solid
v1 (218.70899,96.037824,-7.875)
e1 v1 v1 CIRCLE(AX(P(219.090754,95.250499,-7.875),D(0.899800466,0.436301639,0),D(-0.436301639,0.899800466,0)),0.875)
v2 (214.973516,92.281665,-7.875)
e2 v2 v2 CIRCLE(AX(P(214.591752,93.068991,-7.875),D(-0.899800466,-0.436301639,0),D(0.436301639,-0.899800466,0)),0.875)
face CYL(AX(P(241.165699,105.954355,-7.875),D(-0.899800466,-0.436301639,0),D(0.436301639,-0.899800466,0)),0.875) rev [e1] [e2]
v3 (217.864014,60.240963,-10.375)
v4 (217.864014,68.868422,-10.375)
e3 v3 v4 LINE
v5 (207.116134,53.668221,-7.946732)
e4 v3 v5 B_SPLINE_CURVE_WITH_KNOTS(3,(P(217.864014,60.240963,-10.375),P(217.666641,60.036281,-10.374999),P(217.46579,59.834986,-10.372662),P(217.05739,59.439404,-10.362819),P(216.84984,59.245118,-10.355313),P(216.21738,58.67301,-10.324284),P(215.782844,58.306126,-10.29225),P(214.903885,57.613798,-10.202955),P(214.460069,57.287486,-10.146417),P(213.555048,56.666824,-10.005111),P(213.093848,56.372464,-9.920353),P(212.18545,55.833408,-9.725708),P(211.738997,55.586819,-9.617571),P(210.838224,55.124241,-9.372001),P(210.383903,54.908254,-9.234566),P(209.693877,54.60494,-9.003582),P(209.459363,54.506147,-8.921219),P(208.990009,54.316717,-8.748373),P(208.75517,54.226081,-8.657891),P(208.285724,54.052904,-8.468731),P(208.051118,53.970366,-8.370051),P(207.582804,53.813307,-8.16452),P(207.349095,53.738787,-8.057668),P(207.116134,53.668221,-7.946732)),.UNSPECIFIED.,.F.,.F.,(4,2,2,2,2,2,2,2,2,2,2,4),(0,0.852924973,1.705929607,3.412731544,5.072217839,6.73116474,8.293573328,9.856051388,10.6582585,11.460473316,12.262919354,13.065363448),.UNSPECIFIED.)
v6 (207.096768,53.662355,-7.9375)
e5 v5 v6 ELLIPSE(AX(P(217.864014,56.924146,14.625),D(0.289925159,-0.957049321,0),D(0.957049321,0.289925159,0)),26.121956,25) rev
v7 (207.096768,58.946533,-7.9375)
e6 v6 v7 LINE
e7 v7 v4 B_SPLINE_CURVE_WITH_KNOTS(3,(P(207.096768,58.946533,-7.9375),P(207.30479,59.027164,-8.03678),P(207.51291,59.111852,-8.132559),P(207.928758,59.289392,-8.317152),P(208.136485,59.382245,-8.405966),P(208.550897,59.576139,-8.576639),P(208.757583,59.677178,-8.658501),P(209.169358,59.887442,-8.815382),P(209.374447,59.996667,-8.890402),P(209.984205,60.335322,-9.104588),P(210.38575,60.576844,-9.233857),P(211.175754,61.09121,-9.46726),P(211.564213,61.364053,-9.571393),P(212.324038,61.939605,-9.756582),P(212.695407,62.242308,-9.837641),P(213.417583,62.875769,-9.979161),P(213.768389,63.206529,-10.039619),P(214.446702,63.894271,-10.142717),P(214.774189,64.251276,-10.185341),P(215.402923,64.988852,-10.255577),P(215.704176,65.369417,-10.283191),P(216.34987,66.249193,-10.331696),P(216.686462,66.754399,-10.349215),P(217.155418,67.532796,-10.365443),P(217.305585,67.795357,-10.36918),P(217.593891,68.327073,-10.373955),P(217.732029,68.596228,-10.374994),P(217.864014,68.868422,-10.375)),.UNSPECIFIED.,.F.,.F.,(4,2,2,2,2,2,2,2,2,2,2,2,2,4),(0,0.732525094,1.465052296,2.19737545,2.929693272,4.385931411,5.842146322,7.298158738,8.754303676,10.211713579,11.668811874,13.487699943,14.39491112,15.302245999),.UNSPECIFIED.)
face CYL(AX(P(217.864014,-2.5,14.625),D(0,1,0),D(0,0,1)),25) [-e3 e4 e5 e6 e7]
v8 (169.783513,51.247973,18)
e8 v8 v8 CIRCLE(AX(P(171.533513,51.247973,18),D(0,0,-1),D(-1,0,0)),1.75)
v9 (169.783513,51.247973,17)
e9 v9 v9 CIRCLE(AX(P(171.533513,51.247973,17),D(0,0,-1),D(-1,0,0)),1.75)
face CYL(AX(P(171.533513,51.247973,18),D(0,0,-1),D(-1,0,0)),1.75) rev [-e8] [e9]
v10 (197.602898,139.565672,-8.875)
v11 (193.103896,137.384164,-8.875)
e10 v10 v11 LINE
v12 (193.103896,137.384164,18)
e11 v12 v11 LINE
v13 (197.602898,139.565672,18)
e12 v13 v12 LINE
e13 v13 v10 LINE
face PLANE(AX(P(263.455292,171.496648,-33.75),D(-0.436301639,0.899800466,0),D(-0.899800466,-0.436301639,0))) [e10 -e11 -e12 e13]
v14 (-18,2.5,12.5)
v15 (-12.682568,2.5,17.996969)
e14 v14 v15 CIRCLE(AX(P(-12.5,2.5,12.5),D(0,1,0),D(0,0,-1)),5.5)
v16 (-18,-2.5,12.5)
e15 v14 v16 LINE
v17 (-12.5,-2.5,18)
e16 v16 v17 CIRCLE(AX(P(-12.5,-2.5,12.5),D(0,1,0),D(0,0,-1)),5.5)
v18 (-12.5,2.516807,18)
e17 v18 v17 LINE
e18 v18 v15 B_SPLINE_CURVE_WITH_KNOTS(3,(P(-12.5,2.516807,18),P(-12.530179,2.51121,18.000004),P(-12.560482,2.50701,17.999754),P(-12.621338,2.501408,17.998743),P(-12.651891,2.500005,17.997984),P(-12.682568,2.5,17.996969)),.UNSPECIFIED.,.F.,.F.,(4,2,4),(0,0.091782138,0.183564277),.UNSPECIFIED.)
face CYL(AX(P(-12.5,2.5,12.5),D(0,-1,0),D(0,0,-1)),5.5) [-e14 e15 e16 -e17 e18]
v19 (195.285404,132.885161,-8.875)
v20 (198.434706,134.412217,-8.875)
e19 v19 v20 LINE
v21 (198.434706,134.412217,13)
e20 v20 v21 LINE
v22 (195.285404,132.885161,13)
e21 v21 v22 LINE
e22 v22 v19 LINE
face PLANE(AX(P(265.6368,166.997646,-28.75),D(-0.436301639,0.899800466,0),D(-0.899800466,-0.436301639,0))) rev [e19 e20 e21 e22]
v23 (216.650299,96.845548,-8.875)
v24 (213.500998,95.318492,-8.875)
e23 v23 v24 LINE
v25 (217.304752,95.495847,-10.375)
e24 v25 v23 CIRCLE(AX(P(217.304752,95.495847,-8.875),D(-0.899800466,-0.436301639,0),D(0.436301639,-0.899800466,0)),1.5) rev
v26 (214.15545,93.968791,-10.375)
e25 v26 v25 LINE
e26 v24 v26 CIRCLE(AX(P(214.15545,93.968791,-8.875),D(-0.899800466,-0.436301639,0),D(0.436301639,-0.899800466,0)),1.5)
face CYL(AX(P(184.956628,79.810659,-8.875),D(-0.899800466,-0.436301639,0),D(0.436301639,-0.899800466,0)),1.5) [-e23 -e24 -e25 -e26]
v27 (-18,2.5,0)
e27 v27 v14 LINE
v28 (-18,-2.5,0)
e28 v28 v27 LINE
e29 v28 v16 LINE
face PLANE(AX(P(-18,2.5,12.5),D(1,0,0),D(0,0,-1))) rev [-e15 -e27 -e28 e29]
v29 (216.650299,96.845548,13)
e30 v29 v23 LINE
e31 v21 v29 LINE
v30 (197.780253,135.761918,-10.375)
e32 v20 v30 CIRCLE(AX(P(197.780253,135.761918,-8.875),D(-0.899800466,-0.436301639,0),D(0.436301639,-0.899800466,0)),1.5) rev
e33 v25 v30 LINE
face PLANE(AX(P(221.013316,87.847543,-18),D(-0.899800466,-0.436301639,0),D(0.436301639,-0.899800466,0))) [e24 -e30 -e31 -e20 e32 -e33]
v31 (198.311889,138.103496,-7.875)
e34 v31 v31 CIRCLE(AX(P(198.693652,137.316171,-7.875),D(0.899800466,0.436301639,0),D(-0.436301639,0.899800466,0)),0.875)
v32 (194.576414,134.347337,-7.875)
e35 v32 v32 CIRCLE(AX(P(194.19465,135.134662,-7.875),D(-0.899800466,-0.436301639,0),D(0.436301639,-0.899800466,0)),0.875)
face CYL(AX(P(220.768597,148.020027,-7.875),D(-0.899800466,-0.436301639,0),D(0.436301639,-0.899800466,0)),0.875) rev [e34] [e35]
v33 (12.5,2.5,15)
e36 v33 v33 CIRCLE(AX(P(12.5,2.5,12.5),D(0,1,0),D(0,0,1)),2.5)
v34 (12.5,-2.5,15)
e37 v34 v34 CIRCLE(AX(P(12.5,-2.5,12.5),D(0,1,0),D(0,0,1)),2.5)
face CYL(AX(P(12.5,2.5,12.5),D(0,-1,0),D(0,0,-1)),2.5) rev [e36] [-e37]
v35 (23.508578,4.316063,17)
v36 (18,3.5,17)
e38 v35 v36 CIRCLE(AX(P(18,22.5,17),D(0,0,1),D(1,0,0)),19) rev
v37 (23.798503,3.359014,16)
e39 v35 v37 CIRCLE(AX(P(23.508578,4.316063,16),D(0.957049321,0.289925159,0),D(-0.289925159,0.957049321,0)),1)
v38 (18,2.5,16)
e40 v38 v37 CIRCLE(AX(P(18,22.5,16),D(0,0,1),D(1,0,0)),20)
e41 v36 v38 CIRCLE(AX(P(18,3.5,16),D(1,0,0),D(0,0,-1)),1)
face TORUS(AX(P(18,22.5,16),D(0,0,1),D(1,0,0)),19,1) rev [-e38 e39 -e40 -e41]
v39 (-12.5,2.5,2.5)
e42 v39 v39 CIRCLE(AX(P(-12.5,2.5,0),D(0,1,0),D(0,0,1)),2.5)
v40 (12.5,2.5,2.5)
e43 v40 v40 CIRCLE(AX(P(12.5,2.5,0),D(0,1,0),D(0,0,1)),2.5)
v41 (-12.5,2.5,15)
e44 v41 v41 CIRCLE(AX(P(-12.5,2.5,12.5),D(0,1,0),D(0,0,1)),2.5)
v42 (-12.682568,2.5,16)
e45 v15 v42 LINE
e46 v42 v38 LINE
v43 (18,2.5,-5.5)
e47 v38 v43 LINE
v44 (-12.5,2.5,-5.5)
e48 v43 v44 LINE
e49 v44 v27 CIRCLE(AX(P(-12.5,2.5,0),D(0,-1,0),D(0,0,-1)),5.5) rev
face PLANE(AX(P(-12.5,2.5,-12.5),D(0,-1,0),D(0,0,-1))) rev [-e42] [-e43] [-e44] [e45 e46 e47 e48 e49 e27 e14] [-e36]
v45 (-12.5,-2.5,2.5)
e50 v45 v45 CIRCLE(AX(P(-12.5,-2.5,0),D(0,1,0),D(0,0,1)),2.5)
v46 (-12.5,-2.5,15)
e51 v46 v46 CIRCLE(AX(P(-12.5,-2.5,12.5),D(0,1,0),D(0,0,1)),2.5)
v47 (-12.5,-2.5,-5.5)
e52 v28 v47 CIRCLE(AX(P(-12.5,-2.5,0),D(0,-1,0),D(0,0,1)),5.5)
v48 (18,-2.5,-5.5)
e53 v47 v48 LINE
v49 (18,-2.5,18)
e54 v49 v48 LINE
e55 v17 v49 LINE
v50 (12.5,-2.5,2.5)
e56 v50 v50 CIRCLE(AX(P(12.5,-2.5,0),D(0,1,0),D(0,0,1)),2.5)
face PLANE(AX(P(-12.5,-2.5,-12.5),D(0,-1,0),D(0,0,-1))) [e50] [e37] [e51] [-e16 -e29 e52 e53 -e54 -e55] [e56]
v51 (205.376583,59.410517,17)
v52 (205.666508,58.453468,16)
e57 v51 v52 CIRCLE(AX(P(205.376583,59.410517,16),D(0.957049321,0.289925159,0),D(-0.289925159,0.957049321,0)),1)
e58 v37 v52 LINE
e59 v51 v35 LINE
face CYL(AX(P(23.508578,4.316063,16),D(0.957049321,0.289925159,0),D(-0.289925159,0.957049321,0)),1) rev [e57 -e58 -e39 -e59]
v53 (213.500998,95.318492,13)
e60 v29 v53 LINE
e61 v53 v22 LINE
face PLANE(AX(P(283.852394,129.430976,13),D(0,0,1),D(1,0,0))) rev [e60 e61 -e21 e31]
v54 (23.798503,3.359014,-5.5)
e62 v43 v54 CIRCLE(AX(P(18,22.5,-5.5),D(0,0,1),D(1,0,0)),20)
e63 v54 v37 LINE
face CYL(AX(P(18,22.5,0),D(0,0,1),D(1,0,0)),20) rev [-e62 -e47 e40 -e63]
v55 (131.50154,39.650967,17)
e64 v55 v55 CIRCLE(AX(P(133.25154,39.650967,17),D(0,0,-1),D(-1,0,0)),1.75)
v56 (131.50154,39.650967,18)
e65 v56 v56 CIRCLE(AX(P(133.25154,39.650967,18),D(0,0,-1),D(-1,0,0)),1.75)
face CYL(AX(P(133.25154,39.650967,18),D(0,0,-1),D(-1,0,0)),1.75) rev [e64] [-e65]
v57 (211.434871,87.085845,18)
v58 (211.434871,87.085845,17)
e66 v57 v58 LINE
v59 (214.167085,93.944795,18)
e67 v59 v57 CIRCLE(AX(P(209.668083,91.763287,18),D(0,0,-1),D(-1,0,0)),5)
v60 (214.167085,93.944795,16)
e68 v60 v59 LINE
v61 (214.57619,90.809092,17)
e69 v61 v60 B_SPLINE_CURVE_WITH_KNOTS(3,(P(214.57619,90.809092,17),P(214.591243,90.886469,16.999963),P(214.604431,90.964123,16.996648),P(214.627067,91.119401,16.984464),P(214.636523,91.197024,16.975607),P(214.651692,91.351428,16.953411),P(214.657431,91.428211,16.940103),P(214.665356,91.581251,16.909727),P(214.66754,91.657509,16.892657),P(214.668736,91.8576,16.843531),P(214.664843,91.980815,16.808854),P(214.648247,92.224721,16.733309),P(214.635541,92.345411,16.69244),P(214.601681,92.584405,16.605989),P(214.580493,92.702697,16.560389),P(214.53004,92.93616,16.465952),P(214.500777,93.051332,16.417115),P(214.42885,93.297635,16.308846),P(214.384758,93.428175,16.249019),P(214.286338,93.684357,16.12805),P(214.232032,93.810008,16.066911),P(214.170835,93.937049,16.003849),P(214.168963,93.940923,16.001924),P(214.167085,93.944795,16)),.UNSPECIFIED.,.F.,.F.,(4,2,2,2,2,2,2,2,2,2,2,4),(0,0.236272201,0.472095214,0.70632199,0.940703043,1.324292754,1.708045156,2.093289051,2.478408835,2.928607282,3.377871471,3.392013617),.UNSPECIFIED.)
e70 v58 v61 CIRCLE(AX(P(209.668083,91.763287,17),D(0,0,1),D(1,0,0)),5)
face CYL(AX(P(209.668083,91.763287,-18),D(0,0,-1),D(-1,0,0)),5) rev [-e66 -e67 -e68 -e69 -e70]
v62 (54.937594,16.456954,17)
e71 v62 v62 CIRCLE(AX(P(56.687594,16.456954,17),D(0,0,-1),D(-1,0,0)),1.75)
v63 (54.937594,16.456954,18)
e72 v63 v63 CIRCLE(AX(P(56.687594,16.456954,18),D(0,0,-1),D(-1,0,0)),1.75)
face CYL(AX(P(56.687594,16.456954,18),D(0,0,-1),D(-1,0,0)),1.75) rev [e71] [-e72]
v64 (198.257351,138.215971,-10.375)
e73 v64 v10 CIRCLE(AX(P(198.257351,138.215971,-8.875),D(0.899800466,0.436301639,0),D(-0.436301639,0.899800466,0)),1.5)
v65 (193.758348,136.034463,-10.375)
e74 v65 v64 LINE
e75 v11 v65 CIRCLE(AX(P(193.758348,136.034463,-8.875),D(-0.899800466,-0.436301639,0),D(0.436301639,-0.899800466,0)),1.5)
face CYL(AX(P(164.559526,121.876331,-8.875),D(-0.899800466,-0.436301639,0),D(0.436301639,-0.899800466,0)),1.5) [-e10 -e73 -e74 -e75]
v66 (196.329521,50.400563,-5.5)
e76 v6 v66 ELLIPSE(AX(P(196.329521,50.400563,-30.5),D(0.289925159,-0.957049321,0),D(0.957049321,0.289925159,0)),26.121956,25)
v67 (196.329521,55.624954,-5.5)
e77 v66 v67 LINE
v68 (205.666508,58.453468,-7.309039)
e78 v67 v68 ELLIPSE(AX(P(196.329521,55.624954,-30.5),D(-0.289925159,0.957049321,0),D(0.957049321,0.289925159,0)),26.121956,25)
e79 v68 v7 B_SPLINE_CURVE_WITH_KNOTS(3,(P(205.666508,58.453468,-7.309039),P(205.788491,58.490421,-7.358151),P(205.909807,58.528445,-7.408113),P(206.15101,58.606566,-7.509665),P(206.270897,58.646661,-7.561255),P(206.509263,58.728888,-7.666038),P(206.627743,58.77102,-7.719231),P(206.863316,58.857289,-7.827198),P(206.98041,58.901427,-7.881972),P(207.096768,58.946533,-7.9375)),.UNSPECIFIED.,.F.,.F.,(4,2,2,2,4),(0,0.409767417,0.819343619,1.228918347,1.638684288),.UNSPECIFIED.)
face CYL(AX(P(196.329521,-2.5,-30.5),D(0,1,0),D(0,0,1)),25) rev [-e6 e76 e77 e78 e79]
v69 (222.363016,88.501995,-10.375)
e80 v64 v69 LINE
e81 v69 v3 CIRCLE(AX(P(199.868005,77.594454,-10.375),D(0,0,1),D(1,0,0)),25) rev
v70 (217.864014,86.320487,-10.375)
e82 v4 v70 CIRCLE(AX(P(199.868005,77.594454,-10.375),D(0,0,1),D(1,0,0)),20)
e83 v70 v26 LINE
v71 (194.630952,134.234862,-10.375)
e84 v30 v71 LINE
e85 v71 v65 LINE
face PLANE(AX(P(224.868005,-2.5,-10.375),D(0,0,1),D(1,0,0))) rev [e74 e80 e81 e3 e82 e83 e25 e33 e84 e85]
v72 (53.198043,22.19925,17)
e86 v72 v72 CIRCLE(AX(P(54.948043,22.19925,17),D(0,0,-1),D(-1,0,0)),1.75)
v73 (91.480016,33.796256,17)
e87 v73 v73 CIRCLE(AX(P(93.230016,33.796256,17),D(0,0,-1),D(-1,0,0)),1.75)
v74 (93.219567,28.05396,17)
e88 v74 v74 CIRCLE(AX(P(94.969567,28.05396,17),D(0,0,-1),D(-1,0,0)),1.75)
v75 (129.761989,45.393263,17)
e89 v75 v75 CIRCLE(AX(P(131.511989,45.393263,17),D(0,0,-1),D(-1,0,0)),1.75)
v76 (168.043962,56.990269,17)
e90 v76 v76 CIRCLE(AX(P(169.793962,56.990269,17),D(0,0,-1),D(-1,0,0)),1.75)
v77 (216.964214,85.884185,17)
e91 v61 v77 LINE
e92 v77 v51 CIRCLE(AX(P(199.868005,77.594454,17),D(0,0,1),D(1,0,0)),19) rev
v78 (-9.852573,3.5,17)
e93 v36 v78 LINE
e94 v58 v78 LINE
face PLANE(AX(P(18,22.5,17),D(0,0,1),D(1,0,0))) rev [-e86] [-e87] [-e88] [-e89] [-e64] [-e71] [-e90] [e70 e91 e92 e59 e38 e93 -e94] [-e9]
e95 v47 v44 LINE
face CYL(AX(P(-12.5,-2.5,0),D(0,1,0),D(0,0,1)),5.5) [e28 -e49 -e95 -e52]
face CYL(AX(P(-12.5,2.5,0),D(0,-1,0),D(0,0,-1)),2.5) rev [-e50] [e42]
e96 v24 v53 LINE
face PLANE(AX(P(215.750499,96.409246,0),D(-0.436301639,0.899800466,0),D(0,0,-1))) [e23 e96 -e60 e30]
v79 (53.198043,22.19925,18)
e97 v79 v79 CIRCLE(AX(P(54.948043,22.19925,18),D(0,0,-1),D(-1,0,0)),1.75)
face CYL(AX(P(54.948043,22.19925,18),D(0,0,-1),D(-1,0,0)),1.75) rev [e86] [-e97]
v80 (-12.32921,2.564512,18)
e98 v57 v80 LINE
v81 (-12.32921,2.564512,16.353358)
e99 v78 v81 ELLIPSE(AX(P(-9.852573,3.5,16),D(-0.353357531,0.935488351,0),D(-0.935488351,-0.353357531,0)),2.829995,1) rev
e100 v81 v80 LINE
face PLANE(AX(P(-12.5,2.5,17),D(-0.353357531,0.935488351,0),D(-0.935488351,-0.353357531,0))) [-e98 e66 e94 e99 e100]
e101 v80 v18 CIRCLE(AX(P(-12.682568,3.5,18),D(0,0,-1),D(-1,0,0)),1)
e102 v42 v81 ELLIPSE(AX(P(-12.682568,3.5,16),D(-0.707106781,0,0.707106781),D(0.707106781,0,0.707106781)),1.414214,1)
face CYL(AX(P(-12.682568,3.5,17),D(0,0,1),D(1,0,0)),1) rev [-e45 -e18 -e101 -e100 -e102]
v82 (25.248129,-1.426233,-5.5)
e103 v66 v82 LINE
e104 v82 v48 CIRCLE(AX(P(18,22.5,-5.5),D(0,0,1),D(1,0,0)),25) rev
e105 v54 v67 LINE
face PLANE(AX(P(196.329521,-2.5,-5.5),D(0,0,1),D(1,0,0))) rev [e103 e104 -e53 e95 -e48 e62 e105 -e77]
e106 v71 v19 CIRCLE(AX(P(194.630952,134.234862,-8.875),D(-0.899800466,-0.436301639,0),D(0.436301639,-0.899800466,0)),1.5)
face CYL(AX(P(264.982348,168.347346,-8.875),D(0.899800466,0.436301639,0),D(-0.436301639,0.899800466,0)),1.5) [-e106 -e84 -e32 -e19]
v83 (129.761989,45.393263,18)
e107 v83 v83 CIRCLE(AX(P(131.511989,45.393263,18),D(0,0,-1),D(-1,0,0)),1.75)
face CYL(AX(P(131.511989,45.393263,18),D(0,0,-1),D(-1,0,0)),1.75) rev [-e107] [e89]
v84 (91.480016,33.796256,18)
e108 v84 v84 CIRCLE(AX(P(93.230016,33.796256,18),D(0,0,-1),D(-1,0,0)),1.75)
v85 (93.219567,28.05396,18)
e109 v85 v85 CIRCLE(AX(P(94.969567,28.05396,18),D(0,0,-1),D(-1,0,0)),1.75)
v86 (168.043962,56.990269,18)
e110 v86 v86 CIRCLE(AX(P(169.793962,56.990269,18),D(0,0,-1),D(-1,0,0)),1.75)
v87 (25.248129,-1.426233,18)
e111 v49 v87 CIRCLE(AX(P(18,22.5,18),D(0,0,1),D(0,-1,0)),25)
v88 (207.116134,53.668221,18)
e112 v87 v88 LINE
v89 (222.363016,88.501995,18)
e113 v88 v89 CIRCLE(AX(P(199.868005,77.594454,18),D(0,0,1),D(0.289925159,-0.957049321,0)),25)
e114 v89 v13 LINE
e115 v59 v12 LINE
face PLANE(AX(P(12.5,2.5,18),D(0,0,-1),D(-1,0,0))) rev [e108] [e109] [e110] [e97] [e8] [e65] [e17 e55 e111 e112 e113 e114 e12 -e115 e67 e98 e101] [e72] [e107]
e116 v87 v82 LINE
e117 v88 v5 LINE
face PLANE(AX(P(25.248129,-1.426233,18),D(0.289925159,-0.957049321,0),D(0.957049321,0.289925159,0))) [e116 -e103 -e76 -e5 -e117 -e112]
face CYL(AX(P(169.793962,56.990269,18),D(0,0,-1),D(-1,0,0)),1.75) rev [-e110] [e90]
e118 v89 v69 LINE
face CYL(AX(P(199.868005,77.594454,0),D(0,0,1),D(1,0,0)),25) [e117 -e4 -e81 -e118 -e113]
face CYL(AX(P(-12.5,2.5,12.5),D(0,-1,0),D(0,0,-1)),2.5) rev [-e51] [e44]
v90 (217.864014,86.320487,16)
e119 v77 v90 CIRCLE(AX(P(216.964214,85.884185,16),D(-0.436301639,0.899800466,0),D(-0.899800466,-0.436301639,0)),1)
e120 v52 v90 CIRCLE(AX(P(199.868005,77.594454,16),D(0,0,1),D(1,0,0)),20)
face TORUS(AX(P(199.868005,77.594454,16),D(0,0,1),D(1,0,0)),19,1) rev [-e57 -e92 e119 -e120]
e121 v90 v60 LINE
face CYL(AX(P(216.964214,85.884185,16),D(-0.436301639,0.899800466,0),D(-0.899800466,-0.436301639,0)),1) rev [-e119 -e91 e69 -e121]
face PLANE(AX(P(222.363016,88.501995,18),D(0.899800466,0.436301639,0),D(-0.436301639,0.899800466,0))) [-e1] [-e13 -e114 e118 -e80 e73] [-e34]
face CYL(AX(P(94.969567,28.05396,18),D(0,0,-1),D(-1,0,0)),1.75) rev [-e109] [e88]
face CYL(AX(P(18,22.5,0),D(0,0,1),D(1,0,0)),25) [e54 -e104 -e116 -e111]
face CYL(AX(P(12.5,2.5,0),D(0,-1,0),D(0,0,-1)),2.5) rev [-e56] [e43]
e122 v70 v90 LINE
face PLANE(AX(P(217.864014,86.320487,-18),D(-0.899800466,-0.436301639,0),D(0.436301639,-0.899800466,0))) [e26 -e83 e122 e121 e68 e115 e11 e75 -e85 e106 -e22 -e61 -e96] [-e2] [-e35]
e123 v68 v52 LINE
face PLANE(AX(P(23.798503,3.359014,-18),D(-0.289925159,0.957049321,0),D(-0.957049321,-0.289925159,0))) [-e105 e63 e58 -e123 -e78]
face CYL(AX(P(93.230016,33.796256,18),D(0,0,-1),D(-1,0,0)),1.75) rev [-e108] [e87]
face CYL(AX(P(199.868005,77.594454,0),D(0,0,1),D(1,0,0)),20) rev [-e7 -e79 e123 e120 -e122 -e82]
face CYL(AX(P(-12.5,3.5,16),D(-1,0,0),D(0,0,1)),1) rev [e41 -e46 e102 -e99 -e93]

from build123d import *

# Parameters (mm, degrees)
SKETCH2_R            = 2.5000000000000004
SKETCH2_R_2          = 2.5000000000000018
BOSS_EXTRUDE1_DEPTH  = 2.5
SKETCH5_W            = 36
SKETCH5_H            = 5
SKETCH11_W           = 51.75
SKETCH11_H           = 51.75
SKETCH11_W_2         = 41.75000000000001
SKETCH11_H_2         = 41.75000000000001
BOSS_EXTRUDE2_DEPTH  = 5
SKETCH14_W           = 41.75000000000001
SKETCH14_H           = 41.75000000000003
BOSS_EXTRUDE3_DEPTH  = 1.5
FILLET1_R            = 8
SKETCH18_R           = 0.8750000000000002
CUT_EXTRUDE3_DEPTH   = 254.3041056928498
CUT_EXTRUDE4_START   = -26.0000001
CUT_EXTRUDE4_DEPTH   = 15.6250001
CUT_EXTRUDE4_START_2 = -2.5
CUT_EXTRUDE4_2_DEPTH = 88.820487138
CUT_EXTRUDE5_DEPTH   = 245.11833407729904
FILLET2_R            = 1.5
BOSS_EXTRUDE4_DEPTH  = 1
FILLET3_R            = 1
SKETCH22_R           = 1.7500000000000062
SKETCH22_R_2         = 1.750000000000084
CUT_EXTRUDE6_DEPTH   = 267.0706428279103
LPATTERN1_COUNT      = 4
LPATTERN1_PITCH      = 40
FILLET4_R            = 5


with BuildPart() as part:
    # Sketch2 → Boss-Extrude1 (new, symmetric)
    with BuildSketch(Plane(origin=(0, 0, 0), x_dir=(1, 0, 0), z_dir=(0, 1, 0))):
        with BuildLine():
            Line((-18.000000000000004, -12.5), (-18, 12.5))
            ThreePointArc((-18, 12.5), (-16.38908729652601, 16.38908729652601), (-12.5, 18.000000000000004))
            Line((-12.5, 18.000000000000004), (12.5, 17.999999999999996))
            Line((12.5, 17.999999999999996), (18.000000000000004, 17.999999999999996))
            Line((18.000000000000004, 17.999999999999996), (18.000000000000004, 12.5))
            Line((18.000000000000004, 12.5), (18.000000000000004, -12.5))
            Line((18.000000000000004, -12.5), (18.000000000000004, -18.000000000000004))
            Line((18.000000000000004, -18.000000000000004), (12.5, -18.000000000000004))
            Line((12.5, -18.000000000000004), (-12.5, -18.000000000000004))
            ThreePointArc((-12.5, -18.000000000000004), (-16.389087296526014, -16.389087296526014), (-18.000000000000004, -12.5))
        make_face()
        with Locations(Location((-12.5, 12.5, 0), (0, 0, 270))):
            Circle(SKETCH2_R, mode=Mode.SUBTRACT)
        with Locations(Location((12.5, 12.5, 0), (0, 0, 270))):
            Circle(SKETCH2_R_2, mode=Mode.SUBTRACT)
        with Locations(Location((12.5, -12.5, 0), (0, 0, 270))):
            Circle(SKETCH2_R_2, mode=Mode.SUBTRACT)
        with Locations(Location((-12.5, -12.5, 0), (0, 0, 270))):
            Circle(SKETCH2_R, mode=Mode.SUBTRACT)
        with Locations(Location((-12.5, 0, 0), (0, 0, 270))):
            Circle(SKETCH2_R, mode=Mode.SUBTRACT)
        with Locations(Location((12.5, 0, 0), (0, 0, 270))):
            Circle(SKETCH2_R, mode=Mode.SUBTRACT)
    extrude(amount=BOSS_EXTRUDE1_DEPTH, both=True)

    # Sweep2: sweep along a path in Sketch4
    with BuildLine(Plane.XY) as sweep2_path:
        Line((218.00000000000003, 97.5), (222.36301639377288, 88.50199533520518))
        ThreePointArc((222.36301639377288, 88.50199533520518), (222.77022201371398, 67.5700619217352), (207.11613369668214, 53.66822133117237))
        Line((207.11613369668214, 53.66822133117237), (25.24812896489628, -1.4262330196007162))
        ThreePointArc((25.24812896489628, -1.4262330196007162), (21.66361669051104, -2.2301013492668282), (18.000000000000004, -2.5))
    # Sketch5 → Sweep2 (sweep)
    with BuildSketch(Plane(origin=(18.000000000000004, 0, 0), x_dir=(0, 0, -1), z_dir=(1, 0, 0))):
        Rectangle(SKETCH5_W, SKETCH5_H)
    sweep(path=sweep2_path.line)

    # Sketch11 → Boss-Extrude2 (add)
    with BuildSketch(Plane(origin=(210.27969021067267, 101.96190931709863, 0), x_dir=(0, 0, 1), z_dir=(-0.8998004664794823, -0.43630163937728456, 0))):
        with Locations((-7.874999999999998, 13.491788097501477)):
            Rectangle(SKETCH11_W, SKETCH11_H)
        with Locations((-7.875000000000001, 13.491788097501482)):
            Rectangle(SKETCH11_W_2, SKETCH11_H_2, mode=Mode.SUBTRACT)
    extrude(amount=-BOSS_EXTRUDE2_DEPTH)

    # Sketch14 → Boss-Extrude3 (add)
    with BuildSketch(Plane(origin=(214.7786925430701, 104.14341751398507, 0), x_dir=(0, 0, -1), z_dir=(0.8998004664794823, 0.43630163937728456, 0))):
        with Locations((7.875000000000001, 13.491788097501479)):
            Rectangle(SKETCH14_W, SKETCH14_H)
    extrude(amount=-BOSS_EXTRUDE3_DEPTH)

    # Fillet1
    fillet1_edges = [part.edges().sort_by_distance(p)[0] for p in [
        (217.93200703068783, 91.91024356915939, -17.999999999999936),
    ]]
    fillet(fillet1_edges, radius=FILLET1_R)

    # Sketch18 → Cut-Extrude3 (cut, through all)
    with BuildSketch(Plane(origin=(210.27969021067267, 101.96190931709863, 0), x_dir=(0, 0, 1), z_dir=(-0.8998004664794823, -0.43630163937728456, 0))):
        with Locations(Location((-7.875000000000007, 36.86678809750149, 0), (0, 0, 270))):
            Circle(SKETCH18_R)
        with Locations(Location((-7.874999999999993, -9.883211902498495, 0), (0, 0, 270))):
            Circle(SKETCH18_R)
    extrude(amount=-CUT_EXTRUDE3_DEPTH, mode=Mode.SUBTRACT)

    # Cut-Extrude4: read off the stored shape, not the designer's step
    # Cut-Extrude4 outline → Cut-Extrude4 (cut)
    with BuildSketch(Plane.XY.offset(CUT_EXTRUDE4_START)):
        with BuildLine():
            ThreePointArc((207.116133697, 53.668221331), (222.268763255, 66.494633739), (223.295688181, 86.320487138))
            Line((223.295688181, 86.320487138), (217.864014061, 86.320487138))
            ThreePointArc((217.864014061, 86.320487138), (218.189778557, 69.574940408), (205.666507904, 58.453467935))
            Line((205.666507904, 58.453467935), (23.798503172, 3.359013584))
            ThreePointArc((23.798503172, 3.359013584), (20.930893352, 2.715918921), (18, 2.5))
            Line((18, 2.5), (-18, 2.5))
            Line((-18, 2.5), (-18, -2.5))
            Line((-18, -2.5), (18, -2.5))
            ThreePointArc((18, -2.5), (21.66361669, -2.230101349), (25.248128965, -1.42623302))
            Line((25.248128965, -1.42623302), (207.116133697, 53.668221331))
        make_face()
    extrude(amount=CUT_EXTRUDE4_DEPTH, mode=Mode.SUBTRACT)

    # Cut-Extrude4 2 outline → Cut-Extrude4 2 (cut)
    with BuildSketch(Plane(origin=(0, 0, 0), x_dir=(1, 0, 0), z_dir=(0, 1, 0)).offset(CUT_EXTRUDE4_START_2)):
        with BuildLine():
            ThreePointArc((-18, 0), (-16.389087297, 3.889087297), (-12.5, 5.5))
            Line((-12.5, 5.5), (196.329521381, 5.5))
            ThreePointArc((196.329521381, 5.5), (201.849371922, 6.116988496), (207.096767721, 7.9375))
            ThreePointArc((207.096767721, 7.9375), (212.34416352, 9.758011504), (217.864014061, 10.375))
            Line((217.864014061, 10.375), (13.816956719, 10.375))
            ThreePointArc((13.816956719, 10.375), (12.5, 10), (11.183043281, 10.375))
            Line((11.183043281, 10.375), (-11.183043281, 10.375))
            ThreePointArc((-11.183043281, 10.375), (-12.5, 10), (-13.816956719, 10.375))
            Line((-13.816956719, 10.375), (-18, 10.375))
            Line((-18, 10.375), (-18, 0))
        make_face()
    extrude(amount=CUT_EXTRUDE4_2_DEPTH, mode=Mode.SUBTRACT)

    # Sketch20 → Cut-Extrude5 (cut, through all)
    with BuildSketch(Plane.XZ.offset(-86.32048713831875)):
        Polygon((223.29568818087398, -10.374999999999993), (193.1038960267146, -10.374999999999996), (193.1038960267146, -33.75), (223.29568818087398, -33.74999999999999), align=None)
    extrude(amount=-CUT_EXTRUDE5_DEPTH, mode=Mode.SUBTRACT)

    # Fillet2
    fillet2_edges = [part.edges().sort_by_distance(p)[0] for p in [
        (215.07564848394176, 96.08201967202383, -10.374999999999993),
        (195.35339719291332, 138.4749177094726, -10.374999999999996),
        (196.86005503994014, 133.64868914754223, -10.374999999999996),
    ]]
    fillet(fillet2_edges, radius=FILLET2_R)

    # Sketch21 → Boss-Extrude4 (add)
    with BuildSketch(Plane.XY.offset(18.000000000000004)):
        with BuildLine():
            Line((-12.5, 2.5), (216.5551091432436, 89.01988853775721))
            Line((216.5551091432436, 89.01988853775721), (217.86401406137549, 86.32048713831875))
            ThreePointArc((217.86401406137549, 86.32048713831875), (218.18977855732837, 69.57494040754278), (205.6665079037029, 58.45346793509252))
            Line((205.6665079037029, 58.45346793509252), (23.79850317191702, 3.3590135843194235))
            ThreePointArc((23.79850317191702, 3.3590135843194235), (20.930893352408834, 2.715918920586539), (18.000000000000004, 2.5))
            Line((18.000000000000004, 2.5), (-12.5, 2.5))
        make_face()
    extrude(amount=-BOSS_EXTRUDE4_DEPTH)

    # Fillet3
    fillet3_edges = [part.edges().sort_by_distance(p)[0] for p in [
        (2.7500000000000018, 2.5, 17.000000000000004),
        (-12.5, 2.5, 17.500000000000004),
        (217.20956160230955, 87.67018783803798, 17.000000000000004),
        (218.18977855732837, 69.57494040754277, 17.000000000000004),
        (114.73250553780996, 30.906240759705973, 17.000000000000004),
        (20.93089335240883, 2.715918920586539, 17.000000000000004),
    ]]
    fillet(fillet3_edges, radius=FILLET3_R)

    # Sketch22 → Cut-Extrude6 (cut, through all)
    with BuildSketch(Plane(origin=(0, 0, 17), x_dir=(-1, 0, 0), z_dir=(0, 0, -1))):
        with Locations((-171.53351288563837, 51.24797304135555)):
            Circle(SKETCH22_R)
        with Locations((-169.79396193406333, 56.99026896605974)):
            Circle(SKETCH22_R_2)
    cut_extrude6 = extrude(amount=-CUT_EXTRUDE6_DEPTH, mode=Mode.SUBTRACT)

    # LPattern1: Cut-Extrude6 ×4
    with Locations(*[Vector(-0.9570493207840286, -0.28992515859585144, 0) * (i * LPATTERN1_PITCH) for i in range(1, LPATTERN1_COUNT)]):
        add(cut_extrude6, mode=Mode.SUBTRACT)

    # Fillet4
    fillet4_edges = [part.edges().sort_by_distance(p)[0] for p in [
        (216.55510914324364, 89.01988853775723, 17.000000000000007),
    ]]
    fillet(fillet4_edges, radius=FILLET4_R)


solid = part.part
